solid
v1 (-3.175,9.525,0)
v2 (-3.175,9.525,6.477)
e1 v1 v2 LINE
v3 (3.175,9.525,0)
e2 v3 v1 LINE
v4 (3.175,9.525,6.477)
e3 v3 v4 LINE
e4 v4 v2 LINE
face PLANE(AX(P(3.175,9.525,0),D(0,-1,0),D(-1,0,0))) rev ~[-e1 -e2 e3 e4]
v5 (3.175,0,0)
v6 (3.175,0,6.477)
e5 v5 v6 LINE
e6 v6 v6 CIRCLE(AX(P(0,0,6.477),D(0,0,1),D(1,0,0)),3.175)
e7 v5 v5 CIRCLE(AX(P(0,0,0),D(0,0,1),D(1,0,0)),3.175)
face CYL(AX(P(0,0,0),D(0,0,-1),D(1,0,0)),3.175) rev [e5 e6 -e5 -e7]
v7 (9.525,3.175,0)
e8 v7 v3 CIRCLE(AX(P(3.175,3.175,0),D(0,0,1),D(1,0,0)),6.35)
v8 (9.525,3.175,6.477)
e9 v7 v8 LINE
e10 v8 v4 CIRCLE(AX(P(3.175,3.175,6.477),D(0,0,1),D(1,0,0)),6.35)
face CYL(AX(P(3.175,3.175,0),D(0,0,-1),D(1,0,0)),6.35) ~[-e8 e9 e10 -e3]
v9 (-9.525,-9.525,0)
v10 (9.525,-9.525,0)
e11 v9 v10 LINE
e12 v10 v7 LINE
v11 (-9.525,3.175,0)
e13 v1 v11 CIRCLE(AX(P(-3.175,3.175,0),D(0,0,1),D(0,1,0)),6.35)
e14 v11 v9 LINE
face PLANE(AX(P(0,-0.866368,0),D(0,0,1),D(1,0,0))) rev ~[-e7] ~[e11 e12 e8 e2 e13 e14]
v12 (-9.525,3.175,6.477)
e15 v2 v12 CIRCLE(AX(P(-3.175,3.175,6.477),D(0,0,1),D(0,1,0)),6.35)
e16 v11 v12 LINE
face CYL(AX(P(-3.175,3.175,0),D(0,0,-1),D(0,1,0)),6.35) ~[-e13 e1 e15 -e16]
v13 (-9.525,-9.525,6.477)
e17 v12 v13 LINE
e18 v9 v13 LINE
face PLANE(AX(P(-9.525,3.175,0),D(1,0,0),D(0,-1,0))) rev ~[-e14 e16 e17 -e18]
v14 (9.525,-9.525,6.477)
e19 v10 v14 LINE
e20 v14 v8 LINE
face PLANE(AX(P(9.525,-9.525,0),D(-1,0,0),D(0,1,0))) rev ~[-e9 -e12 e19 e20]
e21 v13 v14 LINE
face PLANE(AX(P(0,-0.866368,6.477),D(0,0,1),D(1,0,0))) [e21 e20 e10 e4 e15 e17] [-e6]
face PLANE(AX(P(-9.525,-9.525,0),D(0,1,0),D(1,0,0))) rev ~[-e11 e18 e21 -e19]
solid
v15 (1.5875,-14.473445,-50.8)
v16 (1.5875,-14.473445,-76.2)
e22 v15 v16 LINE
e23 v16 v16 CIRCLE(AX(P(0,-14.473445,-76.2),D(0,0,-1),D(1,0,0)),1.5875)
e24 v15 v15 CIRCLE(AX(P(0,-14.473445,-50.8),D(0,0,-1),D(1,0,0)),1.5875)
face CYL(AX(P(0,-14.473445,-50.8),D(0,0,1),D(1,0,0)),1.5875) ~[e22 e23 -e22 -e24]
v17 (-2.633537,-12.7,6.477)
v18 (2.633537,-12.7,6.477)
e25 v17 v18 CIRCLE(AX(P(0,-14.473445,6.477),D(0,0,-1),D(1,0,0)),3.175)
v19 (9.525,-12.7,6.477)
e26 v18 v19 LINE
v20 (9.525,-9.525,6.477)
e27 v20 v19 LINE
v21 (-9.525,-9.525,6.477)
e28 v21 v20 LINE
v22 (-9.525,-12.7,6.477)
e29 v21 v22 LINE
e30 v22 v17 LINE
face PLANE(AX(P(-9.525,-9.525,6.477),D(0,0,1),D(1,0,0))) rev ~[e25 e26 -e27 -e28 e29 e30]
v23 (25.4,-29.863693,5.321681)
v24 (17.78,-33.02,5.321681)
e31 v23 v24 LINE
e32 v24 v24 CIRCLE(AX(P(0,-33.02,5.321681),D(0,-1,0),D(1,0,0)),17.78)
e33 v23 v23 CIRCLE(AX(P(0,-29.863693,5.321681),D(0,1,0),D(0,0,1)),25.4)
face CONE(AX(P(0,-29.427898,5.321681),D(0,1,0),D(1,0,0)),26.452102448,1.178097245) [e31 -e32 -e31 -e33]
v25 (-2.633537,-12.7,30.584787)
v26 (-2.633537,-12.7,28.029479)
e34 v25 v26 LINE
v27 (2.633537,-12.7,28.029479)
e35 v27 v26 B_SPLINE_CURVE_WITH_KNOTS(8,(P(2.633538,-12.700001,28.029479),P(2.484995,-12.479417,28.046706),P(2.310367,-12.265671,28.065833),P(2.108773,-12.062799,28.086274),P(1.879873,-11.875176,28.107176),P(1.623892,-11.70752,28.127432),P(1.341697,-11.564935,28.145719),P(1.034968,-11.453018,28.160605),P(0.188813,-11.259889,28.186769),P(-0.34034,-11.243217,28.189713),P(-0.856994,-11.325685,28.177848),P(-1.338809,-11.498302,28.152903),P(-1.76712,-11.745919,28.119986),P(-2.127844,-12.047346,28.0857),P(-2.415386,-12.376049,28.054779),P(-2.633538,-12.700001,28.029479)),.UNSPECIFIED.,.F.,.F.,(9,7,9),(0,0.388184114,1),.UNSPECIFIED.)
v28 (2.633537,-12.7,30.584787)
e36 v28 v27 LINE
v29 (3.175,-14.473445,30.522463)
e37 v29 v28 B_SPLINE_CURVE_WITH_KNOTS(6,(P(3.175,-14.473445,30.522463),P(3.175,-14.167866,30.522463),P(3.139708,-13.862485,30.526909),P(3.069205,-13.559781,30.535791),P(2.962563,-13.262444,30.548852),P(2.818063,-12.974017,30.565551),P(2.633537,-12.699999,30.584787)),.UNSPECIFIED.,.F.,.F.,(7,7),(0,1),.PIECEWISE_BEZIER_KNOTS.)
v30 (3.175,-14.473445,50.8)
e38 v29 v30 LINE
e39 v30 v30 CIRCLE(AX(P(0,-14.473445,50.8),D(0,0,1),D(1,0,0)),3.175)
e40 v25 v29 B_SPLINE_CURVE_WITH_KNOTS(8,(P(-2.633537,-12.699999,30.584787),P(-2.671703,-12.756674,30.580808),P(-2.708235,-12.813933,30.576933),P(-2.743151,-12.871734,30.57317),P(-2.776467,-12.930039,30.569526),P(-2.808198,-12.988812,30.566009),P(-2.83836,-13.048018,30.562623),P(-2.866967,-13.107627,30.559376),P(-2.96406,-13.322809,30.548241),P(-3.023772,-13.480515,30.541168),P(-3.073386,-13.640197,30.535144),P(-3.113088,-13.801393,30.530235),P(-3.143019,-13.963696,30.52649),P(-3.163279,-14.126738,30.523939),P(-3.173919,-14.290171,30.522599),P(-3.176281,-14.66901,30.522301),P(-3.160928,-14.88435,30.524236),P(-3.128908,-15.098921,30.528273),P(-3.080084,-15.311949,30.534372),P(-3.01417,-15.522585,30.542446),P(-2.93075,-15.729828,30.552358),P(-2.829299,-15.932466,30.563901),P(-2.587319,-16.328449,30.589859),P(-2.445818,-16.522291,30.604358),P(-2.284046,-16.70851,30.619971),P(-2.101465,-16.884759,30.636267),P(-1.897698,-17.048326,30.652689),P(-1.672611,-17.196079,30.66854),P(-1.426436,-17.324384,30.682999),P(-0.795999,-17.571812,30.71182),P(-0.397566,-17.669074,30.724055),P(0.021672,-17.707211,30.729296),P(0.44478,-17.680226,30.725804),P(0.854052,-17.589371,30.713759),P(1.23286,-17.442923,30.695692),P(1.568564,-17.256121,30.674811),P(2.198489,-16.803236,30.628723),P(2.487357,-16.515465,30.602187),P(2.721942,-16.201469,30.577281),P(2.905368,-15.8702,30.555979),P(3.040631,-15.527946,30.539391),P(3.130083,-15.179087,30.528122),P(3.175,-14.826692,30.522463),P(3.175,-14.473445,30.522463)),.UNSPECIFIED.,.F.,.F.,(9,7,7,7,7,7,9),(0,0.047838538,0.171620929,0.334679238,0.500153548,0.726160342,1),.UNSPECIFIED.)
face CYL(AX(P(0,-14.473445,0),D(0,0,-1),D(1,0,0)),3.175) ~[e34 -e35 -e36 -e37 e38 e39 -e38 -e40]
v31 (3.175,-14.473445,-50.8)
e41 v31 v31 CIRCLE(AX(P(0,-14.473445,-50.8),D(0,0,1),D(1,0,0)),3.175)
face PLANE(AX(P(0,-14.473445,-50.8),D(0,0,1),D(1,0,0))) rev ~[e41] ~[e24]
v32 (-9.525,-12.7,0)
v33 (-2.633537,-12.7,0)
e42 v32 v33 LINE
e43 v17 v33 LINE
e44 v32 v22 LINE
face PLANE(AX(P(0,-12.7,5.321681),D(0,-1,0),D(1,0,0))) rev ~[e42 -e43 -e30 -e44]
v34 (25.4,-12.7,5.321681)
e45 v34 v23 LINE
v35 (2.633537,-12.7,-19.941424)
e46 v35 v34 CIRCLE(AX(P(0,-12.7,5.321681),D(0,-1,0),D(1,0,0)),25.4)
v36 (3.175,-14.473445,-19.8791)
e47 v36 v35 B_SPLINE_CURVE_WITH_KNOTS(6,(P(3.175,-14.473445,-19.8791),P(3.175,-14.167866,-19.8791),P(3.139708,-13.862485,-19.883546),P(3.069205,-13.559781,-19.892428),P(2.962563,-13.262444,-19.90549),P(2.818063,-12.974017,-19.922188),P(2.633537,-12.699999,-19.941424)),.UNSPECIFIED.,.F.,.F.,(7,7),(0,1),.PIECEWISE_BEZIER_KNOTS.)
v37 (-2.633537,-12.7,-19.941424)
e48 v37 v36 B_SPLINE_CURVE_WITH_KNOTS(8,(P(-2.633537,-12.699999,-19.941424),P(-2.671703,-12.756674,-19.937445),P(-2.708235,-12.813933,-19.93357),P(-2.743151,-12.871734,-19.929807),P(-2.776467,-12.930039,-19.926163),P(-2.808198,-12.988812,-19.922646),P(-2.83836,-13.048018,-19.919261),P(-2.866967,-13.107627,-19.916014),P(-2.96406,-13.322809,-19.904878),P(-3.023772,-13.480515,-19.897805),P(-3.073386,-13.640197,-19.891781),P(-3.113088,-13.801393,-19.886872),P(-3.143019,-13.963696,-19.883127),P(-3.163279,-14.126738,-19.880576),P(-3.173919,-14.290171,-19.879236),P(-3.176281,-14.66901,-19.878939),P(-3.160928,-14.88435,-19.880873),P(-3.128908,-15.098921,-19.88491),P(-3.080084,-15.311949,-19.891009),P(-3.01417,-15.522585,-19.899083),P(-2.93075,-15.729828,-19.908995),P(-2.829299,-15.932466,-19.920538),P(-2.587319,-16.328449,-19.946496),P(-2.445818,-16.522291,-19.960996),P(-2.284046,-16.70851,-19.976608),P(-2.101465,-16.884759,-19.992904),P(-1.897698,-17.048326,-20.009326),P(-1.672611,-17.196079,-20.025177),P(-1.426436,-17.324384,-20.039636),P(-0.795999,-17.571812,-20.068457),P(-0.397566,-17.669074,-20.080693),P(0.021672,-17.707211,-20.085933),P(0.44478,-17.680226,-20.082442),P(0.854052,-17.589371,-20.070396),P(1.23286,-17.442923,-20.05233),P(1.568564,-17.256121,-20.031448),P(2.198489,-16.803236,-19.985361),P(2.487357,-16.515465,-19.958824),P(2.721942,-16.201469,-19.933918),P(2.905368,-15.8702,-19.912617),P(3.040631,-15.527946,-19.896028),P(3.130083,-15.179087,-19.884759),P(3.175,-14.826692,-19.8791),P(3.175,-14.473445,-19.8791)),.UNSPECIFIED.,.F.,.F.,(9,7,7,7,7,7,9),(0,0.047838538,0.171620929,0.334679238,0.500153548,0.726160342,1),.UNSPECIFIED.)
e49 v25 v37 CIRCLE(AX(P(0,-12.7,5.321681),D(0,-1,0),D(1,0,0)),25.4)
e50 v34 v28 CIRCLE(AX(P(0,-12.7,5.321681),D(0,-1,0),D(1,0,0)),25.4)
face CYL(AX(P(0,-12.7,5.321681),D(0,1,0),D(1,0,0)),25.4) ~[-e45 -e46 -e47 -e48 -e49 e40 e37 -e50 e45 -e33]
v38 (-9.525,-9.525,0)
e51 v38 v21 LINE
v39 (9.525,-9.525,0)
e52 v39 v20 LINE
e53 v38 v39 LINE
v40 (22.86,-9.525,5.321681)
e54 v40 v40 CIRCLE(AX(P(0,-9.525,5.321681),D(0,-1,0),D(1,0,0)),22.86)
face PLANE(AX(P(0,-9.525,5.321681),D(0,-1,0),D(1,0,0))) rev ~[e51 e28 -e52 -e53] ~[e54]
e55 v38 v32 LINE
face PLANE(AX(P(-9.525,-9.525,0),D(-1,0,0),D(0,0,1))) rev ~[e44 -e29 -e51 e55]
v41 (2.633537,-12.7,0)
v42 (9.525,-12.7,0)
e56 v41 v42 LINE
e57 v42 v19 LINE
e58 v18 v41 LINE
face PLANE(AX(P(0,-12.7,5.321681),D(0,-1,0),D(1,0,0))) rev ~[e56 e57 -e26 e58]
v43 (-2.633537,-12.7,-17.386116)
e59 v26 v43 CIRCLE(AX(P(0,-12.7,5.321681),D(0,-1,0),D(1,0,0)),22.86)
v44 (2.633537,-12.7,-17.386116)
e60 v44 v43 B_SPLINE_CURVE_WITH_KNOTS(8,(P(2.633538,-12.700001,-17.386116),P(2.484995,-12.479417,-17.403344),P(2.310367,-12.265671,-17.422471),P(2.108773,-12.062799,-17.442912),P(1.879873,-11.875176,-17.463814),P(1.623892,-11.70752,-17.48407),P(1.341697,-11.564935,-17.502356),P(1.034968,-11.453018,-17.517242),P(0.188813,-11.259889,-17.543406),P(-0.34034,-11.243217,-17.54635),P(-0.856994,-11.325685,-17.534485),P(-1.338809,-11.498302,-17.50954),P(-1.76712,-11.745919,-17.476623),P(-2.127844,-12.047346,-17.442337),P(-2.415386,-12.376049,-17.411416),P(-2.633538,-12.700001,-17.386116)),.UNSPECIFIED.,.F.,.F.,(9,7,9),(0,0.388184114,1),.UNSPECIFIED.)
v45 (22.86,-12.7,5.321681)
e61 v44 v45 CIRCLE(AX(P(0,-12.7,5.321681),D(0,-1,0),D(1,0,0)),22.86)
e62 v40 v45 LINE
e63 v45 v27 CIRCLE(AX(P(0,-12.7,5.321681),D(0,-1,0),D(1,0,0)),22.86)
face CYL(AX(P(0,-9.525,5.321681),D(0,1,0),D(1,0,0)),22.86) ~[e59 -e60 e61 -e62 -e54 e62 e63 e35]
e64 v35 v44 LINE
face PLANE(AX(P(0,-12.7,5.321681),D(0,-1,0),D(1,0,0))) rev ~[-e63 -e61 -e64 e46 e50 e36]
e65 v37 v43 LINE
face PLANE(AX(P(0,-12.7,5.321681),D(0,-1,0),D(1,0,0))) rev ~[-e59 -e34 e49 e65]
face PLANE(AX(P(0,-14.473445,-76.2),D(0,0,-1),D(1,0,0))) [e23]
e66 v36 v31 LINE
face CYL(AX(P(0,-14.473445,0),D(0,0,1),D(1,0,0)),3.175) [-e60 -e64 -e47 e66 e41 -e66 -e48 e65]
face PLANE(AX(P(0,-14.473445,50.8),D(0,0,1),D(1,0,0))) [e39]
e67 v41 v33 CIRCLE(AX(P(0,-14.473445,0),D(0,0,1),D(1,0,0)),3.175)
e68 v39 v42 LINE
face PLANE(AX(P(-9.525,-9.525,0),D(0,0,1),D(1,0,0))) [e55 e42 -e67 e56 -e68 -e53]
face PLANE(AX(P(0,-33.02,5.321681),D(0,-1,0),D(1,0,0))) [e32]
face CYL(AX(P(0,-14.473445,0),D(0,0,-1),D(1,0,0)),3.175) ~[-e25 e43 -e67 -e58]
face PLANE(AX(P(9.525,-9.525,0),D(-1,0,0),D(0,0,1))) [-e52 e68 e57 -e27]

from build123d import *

# Parameters (mm, degrees)
F0_R          = 3.175
F1_DEPTH      = 6.477
F2_R          = 22.86
F2_W          = 19.05
F2_H          = 6.477
F3_DEPTH      = 3.175
F4_R          = 25.4
F4_R_2        = 22.86
F4_W          = 19.05
F4_H          = 6.477
F5_DEPTH      = 20.32
F6_SIZE       = 2.54
F8_R          = 3.175
F9_DEPTH      = 50.8
F9_DEPTH_BACK = 50.8
F10_R         = 1.5875
F11_DEPTH     = 25.4


# Not quite as in the source:
# - a fillet or chamfer that OpenCascade refuses, or shapes differently, is made with other operations: its cross-section is extruded or revolved along the edge and cut away or added


with BuildPart() as f1:
    # F0 (on Top) → F1 (new body)
    with BuildSketch(Plane.XY):
        with BuildLine():
            ThreePointArc((9.525, 3.175), (7.6651280605, 7.6651280605), (3.175, 9.525))
            Line((3.175, 9.525), (-3.175, 9.525))
            ThreePointArc((-3.175, 9.525), (-7.6651280605, 7.6651280605), (-9.525, 3.175))
            Line((-9.525, 3.175), (-9.525, -9.525))
            Line((-9.525, -9.525), (9.525, -9.525))
            Line((9.525, -9.525), (9.525, 3.175))
        make_face()
        Circle(F0_R, mode=Mode.SUBTRACT)
    extrude(amount=F1_DEPTH)


with BuildPart() as f3:
    # F2 (on face) → F3 (new body)
    with BuildSketch(Plane.XZ.offset(9.525)):
        with Locations((0, 5.3216813781)):
            Circle(F2_R)
        with Locations((0, 3.2385)):
            Rectangle(F2_W, F2_H, mode=Mode.SUBTRACT)
    extrude(amount=F3_DEPTH)

    # F4 (on face) → F5 (join)
    with BuildSketch(Plane.XZ.offset(12.7)):
        with Locations((0, 5.3216813781)):
            Circle(F4_R)
        with Locations((0, 5.3216813781)):
            Circle(F4_R_2, mode=Mode.SUBTRACT)
        with Locations((0, 5.3216813781)):
            Circle(F4_R_2)
        with Locations((0, 3.2385)):
            Rectangle(F4_W, F4_H, mode=Mode.SUBTRACT)
        with Locations((0, 3.2385)):
            Rectangle(F4_W, F4_H)
    extrude(amount=F5_DEPTH)

    # F6
    f6_edges = [f3.edges().sort_by_distance(p)[0] for p in [
        (-25.4, -33.02, 5.321681),
    ]]
    chamfer(f6_edges, length=F6_SIZE)

    # F7: chamfer of 5.08 on 1 edges, made by hand

    # F7_s1 → F7_t2 (revolve, cut)
    with BuildSketch(Plane.XY.offset(5.3216813781)):
        Polygon((26.4521024484, -29.4278975516), (17.78, -33.02), (22.86, -33.02), align=None)
    revolve(axis=Axis((0, -33.02, 5.3216813781), (0, -1, 0)), mode=Mode.SUBTRACT)

    # F8 (on Top) → F9 (join, two sides)
    with BuildSketch(Plane.XY) as f9_sk:
        with Locations((0, -14.4734445528)):
            Circle(F8_R)
    extrude(amount=F9_DEPTH)
    extrude(f9_sk.sketch, amount=-F9_DEPTH_BACK)

    # F10 (on face) → F11 (join)
    with BuildSketch(Plane(origin=(0, 0, -50.8), x_dir=(1, 0, 0), z_dir=(0, 0, -1))):
        with Locations((0, 14.4734445528)):
            Circle(F10_R)
    extrude(amount=F11_DEPTH)


solid = Compound([f1.part, f3.part])
